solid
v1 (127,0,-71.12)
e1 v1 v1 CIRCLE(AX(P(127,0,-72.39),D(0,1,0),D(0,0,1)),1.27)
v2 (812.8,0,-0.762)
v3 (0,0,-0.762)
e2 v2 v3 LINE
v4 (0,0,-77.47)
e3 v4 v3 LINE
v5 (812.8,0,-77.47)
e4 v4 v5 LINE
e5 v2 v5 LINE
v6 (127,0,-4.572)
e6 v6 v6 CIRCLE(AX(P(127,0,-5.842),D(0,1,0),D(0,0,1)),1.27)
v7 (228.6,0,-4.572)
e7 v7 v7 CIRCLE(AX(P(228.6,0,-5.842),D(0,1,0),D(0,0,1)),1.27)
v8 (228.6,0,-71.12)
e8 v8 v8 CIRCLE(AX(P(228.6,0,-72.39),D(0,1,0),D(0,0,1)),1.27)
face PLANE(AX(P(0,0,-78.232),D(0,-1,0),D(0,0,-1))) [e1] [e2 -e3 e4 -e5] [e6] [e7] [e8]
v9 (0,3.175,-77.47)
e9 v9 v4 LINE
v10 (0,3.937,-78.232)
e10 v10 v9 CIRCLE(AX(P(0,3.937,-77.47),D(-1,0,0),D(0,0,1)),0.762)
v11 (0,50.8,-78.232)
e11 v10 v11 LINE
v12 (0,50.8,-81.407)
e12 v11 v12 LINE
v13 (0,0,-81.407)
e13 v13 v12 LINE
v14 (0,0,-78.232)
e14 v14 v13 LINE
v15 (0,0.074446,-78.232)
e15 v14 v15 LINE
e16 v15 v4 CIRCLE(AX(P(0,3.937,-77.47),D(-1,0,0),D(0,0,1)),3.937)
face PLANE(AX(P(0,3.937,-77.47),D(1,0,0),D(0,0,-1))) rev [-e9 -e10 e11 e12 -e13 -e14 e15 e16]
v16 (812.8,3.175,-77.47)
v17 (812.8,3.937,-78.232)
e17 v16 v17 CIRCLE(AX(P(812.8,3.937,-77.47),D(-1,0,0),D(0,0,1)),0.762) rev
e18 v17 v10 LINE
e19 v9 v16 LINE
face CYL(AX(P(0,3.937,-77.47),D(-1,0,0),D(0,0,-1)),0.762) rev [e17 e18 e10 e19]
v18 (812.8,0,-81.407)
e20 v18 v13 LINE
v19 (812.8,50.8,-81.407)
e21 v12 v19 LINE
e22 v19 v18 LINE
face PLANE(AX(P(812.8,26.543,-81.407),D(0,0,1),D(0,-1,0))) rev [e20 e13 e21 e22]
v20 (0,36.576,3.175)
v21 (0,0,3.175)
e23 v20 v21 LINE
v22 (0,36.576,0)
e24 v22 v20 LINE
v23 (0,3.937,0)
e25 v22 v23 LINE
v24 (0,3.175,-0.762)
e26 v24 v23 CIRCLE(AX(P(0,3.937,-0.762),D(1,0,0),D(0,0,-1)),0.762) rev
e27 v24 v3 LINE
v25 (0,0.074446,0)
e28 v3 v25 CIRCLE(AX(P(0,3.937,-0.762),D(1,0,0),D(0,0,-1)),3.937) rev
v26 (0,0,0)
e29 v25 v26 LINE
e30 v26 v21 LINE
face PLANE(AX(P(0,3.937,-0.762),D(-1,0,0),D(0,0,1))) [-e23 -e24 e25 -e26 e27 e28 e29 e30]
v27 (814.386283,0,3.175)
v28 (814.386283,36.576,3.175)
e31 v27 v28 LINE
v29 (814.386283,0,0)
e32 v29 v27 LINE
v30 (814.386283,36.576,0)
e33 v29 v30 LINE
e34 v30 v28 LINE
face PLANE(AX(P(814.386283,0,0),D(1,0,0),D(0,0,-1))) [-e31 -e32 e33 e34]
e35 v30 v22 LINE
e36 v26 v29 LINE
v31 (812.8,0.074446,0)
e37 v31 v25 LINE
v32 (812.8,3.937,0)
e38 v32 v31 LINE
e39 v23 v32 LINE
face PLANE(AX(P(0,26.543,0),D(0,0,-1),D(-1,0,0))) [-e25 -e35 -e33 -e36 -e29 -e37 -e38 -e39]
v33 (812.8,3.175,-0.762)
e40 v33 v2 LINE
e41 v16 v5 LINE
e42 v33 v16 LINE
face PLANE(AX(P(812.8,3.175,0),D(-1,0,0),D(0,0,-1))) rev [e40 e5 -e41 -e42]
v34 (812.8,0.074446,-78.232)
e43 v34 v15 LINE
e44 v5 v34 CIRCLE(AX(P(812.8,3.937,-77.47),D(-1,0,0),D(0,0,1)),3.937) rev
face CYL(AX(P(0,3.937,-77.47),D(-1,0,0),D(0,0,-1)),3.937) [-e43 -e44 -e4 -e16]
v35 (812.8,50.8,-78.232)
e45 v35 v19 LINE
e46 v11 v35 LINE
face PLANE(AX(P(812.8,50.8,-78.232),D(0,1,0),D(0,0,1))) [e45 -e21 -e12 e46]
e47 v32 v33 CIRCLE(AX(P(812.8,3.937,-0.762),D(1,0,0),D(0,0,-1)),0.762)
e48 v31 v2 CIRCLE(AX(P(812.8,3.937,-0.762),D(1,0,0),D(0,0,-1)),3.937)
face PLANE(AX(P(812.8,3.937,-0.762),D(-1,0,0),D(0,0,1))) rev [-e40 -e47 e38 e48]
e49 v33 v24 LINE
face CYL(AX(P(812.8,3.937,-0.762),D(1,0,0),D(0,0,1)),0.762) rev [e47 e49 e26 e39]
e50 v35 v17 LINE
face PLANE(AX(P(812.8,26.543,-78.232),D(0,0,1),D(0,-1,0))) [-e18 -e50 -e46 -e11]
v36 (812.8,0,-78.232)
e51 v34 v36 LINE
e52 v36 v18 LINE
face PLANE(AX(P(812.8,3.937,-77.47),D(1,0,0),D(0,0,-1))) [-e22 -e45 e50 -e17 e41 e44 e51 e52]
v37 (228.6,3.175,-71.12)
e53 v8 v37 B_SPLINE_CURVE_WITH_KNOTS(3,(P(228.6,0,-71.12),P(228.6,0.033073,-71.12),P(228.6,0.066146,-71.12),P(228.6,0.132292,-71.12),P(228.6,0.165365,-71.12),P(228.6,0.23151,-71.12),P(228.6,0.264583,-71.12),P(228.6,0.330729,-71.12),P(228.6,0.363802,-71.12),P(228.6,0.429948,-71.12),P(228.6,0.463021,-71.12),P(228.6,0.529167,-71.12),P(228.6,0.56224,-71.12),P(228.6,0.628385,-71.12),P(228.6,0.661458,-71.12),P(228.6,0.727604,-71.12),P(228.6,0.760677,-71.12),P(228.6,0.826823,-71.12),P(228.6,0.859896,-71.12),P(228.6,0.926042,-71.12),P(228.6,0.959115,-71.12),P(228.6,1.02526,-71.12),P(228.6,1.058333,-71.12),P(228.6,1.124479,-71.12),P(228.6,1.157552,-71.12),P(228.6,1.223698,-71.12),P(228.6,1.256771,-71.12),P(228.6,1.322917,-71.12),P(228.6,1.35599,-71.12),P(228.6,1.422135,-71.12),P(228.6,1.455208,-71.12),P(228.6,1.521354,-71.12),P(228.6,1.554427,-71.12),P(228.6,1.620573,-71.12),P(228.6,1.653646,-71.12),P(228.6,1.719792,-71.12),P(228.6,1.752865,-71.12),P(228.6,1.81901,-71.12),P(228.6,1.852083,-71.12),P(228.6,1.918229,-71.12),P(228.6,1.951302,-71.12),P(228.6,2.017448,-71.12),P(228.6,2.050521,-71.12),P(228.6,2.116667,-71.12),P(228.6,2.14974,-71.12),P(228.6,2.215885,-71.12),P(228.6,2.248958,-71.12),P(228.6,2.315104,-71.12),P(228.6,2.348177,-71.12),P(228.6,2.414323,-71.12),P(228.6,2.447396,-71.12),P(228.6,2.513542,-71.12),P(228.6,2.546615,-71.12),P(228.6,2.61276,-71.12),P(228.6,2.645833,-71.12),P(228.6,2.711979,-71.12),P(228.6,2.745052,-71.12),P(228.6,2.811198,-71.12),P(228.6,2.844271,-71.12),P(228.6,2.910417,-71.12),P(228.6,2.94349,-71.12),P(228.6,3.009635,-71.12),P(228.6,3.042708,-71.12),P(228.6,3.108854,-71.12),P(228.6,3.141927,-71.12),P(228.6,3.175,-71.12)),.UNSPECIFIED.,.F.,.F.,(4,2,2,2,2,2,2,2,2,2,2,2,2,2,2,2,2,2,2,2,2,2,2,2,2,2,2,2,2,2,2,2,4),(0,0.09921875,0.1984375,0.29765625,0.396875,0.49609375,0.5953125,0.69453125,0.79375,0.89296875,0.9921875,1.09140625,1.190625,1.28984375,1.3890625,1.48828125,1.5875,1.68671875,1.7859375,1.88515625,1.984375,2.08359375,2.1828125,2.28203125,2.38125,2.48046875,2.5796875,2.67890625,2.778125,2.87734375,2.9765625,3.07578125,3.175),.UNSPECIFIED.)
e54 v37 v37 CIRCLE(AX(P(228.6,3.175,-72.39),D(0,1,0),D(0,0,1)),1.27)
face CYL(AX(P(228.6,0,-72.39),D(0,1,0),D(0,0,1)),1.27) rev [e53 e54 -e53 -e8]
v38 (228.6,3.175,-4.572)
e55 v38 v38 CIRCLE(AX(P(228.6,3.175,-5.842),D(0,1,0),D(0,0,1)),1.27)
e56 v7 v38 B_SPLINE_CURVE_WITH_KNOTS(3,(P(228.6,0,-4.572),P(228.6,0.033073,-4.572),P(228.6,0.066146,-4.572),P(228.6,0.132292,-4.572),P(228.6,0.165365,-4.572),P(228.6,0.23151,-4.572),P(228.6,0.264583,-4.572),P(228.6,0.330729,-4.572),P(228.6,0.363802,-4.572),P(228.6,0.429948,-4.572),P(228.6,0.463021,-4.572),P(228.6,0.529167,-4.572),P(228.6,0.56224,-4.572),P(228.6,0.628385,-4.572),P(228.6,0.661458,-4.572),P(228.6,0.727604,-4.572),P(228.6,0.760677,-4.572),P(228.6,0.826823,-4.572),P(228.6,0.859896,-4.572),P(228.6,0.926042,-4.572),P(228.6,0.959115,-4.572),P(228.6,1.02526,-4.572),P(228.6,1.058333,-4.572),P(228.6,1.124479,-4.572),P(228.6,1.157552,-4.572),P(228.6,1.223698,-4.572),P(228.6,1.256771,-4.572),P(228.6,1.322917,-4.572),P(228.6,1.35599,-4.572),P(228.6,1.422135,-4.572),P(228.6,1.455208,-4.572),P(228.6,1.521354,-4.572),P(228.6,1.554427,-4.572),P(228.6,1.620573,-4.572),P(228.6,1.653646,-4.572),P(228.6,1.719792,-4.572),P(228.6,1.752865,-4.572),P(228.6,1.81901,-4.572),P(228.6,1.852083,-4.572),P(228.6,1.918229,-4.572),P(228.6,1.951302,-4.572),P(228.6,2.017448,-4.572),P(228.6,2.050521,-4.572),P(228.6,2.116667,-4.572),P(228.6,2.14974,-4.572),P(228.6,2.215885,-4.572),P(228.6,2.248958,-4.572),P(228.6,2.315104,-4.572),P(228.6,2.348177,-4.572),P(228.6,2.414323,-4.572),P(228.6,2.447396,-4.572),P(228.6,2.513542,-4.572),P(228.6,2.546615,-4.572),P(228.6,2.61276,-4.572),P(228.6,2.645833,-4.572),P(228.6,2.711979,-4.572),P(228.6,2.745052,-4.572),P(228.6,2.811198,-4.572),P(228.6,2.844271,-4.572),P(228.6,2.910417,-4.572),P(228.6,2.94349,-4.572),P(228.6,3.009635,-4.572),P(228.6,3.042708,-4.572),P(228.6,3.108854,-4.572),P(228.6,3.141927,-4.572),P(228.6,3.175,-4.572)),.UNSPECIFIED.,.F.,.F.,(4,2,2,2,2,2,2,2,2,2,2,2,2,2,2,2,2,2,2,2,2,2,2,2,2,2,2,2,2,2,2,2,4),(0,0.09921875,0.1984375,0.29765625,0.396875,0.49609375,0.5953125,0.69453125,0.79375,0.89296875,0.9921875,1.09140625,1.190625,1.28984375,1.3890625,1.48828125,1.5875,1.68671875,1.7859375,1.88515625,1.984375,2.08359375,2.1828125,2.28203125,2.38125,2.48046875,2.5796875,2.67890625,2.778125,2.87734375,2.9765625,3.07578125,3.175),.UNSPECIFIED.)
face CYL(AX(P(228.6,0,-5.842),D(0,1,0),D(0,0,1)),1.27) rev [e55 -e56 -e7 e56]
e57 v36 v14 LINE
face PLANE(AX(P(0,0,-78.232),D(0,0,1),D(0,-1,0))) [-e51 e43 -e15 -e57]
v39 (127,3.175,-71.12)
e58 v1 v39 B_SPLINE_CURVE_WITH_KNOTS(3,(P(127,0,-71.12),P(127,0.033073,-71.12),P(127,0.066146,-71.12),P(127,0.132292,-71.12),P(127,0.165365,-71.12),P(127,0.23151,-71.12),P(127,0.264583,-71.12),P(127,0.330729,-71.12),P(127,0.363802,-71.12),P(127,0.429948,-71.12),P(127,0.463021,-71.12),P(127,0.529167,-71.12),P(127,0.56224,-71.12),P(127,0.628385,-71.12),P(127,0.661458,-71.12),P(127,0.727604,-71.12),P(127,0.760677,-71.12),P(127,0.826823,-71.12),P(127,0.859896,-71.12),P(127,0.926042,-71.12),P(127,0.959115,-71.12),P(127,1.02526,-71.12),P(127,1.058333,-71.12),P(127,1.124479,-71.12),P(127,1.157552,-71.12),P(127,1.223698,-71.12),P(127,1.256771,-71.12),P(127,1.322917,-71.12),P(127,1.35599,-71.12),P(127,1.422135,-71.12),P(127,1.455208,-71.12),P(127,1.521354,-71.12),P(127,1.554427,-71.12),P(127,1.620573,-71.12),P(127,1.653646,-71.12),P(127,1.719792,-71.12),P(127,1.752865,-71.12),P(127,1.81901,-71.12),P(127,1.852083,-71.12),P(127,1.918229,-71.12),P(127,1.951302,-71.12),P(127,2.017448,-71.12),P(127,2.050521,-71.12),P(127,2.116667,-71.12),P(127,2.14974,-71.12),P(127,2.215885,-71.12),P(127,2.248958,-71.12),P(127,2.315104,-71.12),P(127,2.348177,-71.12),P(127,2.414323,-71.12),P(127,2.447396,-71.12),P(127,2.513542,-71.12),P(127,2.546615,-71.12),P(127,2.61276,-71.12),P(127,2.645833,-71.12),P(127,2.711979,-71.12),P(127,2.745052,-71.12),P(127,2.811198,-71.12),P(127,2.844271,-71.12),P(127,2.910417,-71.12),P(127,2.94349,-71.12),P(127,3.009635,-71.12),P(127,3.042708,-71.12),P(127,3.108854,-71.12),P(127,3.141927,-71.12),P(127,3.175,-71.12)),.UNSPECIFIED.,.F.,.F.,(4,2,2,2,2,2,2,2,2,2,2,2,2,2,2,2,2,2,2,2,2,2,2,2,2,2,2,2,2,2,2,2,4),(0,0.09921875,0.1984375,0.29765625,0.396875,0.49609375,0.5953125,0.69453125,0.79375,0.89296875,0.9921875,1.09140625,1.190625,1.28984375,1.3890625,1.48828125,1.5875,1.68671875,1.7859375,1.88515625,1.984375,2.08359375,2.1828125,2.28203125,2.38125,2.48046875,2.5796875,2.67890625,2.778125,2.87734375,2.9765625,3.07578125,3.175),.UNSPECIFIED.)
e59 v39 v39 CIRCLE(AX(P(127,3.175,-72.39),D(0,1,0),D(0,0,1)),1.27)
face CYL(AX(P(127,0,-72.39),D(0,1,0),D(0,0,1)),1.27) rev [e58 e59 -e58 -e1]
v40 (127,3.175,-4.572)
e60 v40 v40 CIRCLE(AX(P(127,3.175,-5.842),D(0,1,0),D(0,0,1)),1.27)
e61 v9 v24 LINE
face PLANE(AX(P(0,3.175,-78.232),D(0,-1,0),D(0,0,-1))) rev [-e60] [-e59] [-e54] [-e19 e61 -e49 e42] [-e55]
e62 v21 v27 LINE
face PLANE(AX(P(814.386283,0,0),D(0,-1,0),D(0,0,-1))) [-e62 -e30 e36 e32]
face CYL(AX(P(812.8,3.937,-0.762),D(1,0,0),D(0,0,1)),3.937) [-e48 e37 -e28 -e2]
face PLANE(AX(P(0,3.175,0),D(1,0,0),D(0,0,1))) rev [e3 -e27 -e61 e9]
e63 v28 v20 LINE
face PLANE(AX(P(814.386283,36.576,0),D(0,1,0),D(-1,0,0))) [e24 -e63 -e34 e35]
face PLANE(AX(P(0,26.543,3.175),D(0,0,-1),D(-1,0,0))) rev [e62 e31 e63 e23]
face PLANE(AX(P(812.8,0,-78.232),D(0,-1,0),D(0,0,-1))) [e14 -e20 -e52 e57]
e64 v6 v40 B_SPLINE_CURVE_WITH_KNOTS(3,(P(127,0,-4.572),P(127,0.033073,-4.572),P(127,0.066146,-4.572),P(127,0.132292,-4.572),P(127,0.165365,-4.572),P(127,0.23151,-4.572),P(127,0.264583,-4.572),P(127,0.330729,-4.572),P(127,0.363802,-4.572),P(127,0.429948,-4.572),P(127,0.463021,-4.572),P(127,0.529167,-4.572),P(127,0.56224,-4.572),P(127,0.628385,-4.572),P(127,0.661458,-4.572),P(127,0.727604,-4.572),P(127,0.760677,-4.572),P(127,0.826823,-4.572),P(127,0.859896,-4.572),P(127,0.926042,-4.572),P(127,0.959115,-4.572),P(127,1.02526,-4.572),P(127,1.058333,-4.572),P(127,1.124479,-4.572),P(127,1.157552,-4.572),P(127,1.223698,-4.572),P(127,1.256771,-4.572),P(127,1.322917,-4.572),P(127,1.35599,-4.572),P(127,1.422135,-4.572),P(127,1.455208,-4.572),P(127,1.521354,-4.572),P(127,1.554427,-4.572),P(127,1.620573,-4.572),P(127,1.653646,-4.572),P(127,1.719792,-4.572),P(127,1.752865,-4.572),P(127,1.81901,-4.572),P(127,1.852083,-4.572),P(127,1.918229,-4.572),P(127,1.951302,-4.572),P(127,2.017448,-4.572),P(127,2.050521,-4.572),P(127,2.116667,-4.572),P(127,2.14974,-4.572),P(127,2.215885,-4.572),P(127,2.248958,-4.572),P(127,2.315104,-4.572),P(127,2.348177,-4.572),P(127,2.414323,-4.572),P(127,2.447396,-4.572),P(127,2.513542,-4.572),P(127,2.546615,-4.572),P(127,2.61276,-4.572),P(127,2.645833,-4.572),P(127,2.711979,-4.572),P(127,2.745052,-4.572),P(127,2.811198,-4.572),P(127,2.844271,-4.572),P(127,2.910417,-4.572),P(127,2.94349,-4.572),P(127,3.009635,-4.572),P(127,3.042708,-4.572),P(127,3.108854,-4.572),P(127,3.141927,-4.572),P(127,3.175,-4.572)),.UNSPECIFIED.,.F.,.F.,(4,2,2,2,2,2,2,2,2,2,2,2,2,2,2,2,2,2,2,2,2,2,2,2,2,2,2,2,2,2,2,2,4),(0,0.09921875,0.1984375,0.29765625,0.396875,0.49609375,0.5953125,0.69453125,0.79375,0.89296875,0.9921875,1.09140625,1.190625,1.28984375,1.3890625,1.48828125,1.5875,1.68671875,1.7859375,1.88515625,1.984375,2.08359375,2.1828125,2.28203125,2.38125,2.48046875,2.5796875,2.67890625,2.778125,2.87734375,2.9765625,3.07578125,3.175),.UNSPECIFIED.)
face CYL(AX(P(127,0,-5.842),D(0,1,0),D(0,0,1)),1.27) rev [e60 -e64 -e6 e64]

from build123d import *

# Parameters (mm, degrees)
SKETCH1_W                    = 812.8
SKETCH1_H                    = 78.232
BOSS_EXTRUDE1_DEPTH          = 3.175
EDGE_FLANGE1_STRIP_W         = 14.224
EDGE_FLANGE1_STRIP_H         = 3.175
EDGE_FLANGE1_STRIP_CUT_DEPTH = 812.8
EDGE_FLANGE1_DEPTH           = 812.8
EDGE_FLANGE2_STRIP_W         = 14.224
EDGE_FLANGE2_STRIP_H         = 3.175
EDGE_FLANGE2_STRIP_CUT_DEPTH = 812.8
EDGE_FLANGE2_DEPTH           = 812.8
SKETCH9_R                    = 2.667
CUT_EXTRUDE1_DEPTH           = 818.620012948
CHAMFER1_SIZE                = 3.175
SKETCH12_R                   = 1.27
CUT_EXTRUDE4_DEPTH           = 818.20071162
SKETCH15_W                   = 812.8
SKETCH15_H                   = 50.8
BOSS_EXTRUDE2_DEPTH          = 3.175
SKETCH16_W                   = 814.386282527
SKETCH16_H                   = 36.576
BOSS_EXTRUDE3_DEPTH          = 3.175


# Sheet-metal steps are written as plain solids
with BuildPart() as part:
    # Sketch1 → Boss-Extrude1 (new body)
    with BuildSketch(Plane(origin=(0, 0, 0), x_dir=(1, 0, 0), z_dir=(0, 1, 0))):
        with Locations((406.4, 39.116)):
            Rectangle(SKETCH1_W, SKETCH1_H)
    extrude(amount=BOSS_EXTRUDE1_DEPTH)

    # Edge-Flange1 strip (across the edge) → Edge-Flange1 strip cut (cut)
    with BuildSketch(Plane(origin=(812.8, 3.175, -78.232), x_dir=(0, 0, 1), z_dir=(-1, 0, 0))):
        with Locations((-6.35, -1.5875)):
            Rectangle(EDGE_FLANGE1_STRIP_W, EDGE_FLANGE1_STRIP_H)
    extrude(amount=EDGE_FLANGE1_STRIP_CUT_DEPTH, mode=Mode.SUBTRACT)

    # Edge-Flange1 section (across the edge) → Edge-Flange1 (add)
    with BuildSketch(Plane(origin=(812.8, 3.175, -78.232), x_dir=(0, 0, 1), z_dir=(-1, 0, 0))):
        with BuildLine():
            Line((-3.175, 0.762), (-3.175, 23.368))
            Line((-3.175, 23.368), (0, 23.368))
            Line((0, 23.368), (0, 0.762))
            ThreePointArc((0, 0.762), (0.223184633, 0.223184633), (0.762, 0))
            Line((0.762, 0), (0.762, -3.175))
            ThreePointArc((0.762, -3.175), (-2.021879398, -2.021879398), (-3.175, 0.762))
        make_face()
    extrude(amount=EDGE_FLANGE1_DEPTH)

    # Edge-Flange2 strip (across the edge) → Edge-Flange2 strip cut (cut)
    with BuildSketch(Plane(origin=(0, 3.175, 0), x_dir=(0, 0, -1), z_dir=(1, 0, 0))):
        with Locations((-6.35, -1.5875)):
            Rectangle(EDGE_FLANGE2_STRIP_W, EDGE_FLANGE2_STRIP_H)
    extrude(amount=EDGE_FLANGE2_STRIP_CUT_DEPTH, mode=Mode.SUBTRACT)

    # Edge-Flange2 section (across the edge) → Edge-Flange2 (add)
    with BuildSketch(Plane(origin=(0, 3.175, 0), x_dir=(0, 0, -1), z_dir=(1, 0, 0))):
        with BuildLine():
            Line((-3.175, 0.762), (-3.175, 23.368))
            Line((-3.175, 23.368), (0, 23.368))
            Line((0, 23.368), (0, 0.762))
            ThreePointArc((0, 0.762), (0.223184633, 0.223184633), (0.762, 0))
            Line((0.762, 0), (0.762, -3.175))
            ThreePointArc((0.762, -3.175), (-2.021879398, -2.021879398), (-3.175, 0.762))
        make_face()
    extrude(amount=EDGE_FLANGE2_DEPTH)

    # Sketch9 → Cut-Extrude1 (cut, through all)
    with BuildSketch(Plane.XY.offset(3.175)):
        with Locations((806.45, 16.637)):
            Circle(SKETCH9_R)
    extrude(amount=-CUT_EXTRUDE1_DEPTH, mode=Mode.SUBTRACT)

    # Chamfer1
    chamfer1_edges = [part.edges().sort_by_distance(p)[0] for p in [
        (812.8, 26.543, -79.8195),
        (0, 26.543, -79.8195),
        (0, 26.543, 1.5875),
        (812.8, 26.543, 1.5875),
    ]]
    chamfer(chamfer1_edges, length=CHAMFER1_SIZE)

    # Sketch12 → Cut-Extrude4 (cut, through all)
    with BuildSketch(Plane(origin=(0, 3.175, 0), x_dir=(1, 0, 0), z_dir=(0, 1, 0))):
        with Locations(Location((127, 72.39, 0), (0, 0, 270))):
            Circle(SKETCH12_R)
        with Locations(Location((228.6, 72.39, 0), (0, 0, 270))):
            Circle(SKETCH12_R)
        with Locations(Location((228.6, 5.842, 0), (0, 0, 270))):
            Circle(SKETCH12_R)
        with Locations(Location((127, 5.842, 0), (0, 0, 270))):
            Circle(SKETCH12_R)
    extrude(amount=-CUT_EXTRUDE4_DEPTH, mode=Mode.SUBTRACT)

    # Sketch15 → Boss-Extrude2 (add)
    with BuildSketch(Plane(origin=(0, 0, -81.407), x_dir=(-1, 0, 0), z_dir=(0, 0, -1))):
        with Locations((-406.4, 25.4)):
            Rectangle(SKETCH15_W, SKETCH15_H)
    extrude(amount=-BOSS_EXTRUDE2_DEPTH)

    # Sketch16 → Boss-Extrude3 (add)
    with BuildSketch(Plane.XY.offset(3.175)):
        with Locations((407.193141264, 18.288)):
            Rectangle(SKETCH16_W, SKETCH16_H)
    extrude(amount=-BOSS_EXTRUDE3_DEPTH)


solid = part.part
